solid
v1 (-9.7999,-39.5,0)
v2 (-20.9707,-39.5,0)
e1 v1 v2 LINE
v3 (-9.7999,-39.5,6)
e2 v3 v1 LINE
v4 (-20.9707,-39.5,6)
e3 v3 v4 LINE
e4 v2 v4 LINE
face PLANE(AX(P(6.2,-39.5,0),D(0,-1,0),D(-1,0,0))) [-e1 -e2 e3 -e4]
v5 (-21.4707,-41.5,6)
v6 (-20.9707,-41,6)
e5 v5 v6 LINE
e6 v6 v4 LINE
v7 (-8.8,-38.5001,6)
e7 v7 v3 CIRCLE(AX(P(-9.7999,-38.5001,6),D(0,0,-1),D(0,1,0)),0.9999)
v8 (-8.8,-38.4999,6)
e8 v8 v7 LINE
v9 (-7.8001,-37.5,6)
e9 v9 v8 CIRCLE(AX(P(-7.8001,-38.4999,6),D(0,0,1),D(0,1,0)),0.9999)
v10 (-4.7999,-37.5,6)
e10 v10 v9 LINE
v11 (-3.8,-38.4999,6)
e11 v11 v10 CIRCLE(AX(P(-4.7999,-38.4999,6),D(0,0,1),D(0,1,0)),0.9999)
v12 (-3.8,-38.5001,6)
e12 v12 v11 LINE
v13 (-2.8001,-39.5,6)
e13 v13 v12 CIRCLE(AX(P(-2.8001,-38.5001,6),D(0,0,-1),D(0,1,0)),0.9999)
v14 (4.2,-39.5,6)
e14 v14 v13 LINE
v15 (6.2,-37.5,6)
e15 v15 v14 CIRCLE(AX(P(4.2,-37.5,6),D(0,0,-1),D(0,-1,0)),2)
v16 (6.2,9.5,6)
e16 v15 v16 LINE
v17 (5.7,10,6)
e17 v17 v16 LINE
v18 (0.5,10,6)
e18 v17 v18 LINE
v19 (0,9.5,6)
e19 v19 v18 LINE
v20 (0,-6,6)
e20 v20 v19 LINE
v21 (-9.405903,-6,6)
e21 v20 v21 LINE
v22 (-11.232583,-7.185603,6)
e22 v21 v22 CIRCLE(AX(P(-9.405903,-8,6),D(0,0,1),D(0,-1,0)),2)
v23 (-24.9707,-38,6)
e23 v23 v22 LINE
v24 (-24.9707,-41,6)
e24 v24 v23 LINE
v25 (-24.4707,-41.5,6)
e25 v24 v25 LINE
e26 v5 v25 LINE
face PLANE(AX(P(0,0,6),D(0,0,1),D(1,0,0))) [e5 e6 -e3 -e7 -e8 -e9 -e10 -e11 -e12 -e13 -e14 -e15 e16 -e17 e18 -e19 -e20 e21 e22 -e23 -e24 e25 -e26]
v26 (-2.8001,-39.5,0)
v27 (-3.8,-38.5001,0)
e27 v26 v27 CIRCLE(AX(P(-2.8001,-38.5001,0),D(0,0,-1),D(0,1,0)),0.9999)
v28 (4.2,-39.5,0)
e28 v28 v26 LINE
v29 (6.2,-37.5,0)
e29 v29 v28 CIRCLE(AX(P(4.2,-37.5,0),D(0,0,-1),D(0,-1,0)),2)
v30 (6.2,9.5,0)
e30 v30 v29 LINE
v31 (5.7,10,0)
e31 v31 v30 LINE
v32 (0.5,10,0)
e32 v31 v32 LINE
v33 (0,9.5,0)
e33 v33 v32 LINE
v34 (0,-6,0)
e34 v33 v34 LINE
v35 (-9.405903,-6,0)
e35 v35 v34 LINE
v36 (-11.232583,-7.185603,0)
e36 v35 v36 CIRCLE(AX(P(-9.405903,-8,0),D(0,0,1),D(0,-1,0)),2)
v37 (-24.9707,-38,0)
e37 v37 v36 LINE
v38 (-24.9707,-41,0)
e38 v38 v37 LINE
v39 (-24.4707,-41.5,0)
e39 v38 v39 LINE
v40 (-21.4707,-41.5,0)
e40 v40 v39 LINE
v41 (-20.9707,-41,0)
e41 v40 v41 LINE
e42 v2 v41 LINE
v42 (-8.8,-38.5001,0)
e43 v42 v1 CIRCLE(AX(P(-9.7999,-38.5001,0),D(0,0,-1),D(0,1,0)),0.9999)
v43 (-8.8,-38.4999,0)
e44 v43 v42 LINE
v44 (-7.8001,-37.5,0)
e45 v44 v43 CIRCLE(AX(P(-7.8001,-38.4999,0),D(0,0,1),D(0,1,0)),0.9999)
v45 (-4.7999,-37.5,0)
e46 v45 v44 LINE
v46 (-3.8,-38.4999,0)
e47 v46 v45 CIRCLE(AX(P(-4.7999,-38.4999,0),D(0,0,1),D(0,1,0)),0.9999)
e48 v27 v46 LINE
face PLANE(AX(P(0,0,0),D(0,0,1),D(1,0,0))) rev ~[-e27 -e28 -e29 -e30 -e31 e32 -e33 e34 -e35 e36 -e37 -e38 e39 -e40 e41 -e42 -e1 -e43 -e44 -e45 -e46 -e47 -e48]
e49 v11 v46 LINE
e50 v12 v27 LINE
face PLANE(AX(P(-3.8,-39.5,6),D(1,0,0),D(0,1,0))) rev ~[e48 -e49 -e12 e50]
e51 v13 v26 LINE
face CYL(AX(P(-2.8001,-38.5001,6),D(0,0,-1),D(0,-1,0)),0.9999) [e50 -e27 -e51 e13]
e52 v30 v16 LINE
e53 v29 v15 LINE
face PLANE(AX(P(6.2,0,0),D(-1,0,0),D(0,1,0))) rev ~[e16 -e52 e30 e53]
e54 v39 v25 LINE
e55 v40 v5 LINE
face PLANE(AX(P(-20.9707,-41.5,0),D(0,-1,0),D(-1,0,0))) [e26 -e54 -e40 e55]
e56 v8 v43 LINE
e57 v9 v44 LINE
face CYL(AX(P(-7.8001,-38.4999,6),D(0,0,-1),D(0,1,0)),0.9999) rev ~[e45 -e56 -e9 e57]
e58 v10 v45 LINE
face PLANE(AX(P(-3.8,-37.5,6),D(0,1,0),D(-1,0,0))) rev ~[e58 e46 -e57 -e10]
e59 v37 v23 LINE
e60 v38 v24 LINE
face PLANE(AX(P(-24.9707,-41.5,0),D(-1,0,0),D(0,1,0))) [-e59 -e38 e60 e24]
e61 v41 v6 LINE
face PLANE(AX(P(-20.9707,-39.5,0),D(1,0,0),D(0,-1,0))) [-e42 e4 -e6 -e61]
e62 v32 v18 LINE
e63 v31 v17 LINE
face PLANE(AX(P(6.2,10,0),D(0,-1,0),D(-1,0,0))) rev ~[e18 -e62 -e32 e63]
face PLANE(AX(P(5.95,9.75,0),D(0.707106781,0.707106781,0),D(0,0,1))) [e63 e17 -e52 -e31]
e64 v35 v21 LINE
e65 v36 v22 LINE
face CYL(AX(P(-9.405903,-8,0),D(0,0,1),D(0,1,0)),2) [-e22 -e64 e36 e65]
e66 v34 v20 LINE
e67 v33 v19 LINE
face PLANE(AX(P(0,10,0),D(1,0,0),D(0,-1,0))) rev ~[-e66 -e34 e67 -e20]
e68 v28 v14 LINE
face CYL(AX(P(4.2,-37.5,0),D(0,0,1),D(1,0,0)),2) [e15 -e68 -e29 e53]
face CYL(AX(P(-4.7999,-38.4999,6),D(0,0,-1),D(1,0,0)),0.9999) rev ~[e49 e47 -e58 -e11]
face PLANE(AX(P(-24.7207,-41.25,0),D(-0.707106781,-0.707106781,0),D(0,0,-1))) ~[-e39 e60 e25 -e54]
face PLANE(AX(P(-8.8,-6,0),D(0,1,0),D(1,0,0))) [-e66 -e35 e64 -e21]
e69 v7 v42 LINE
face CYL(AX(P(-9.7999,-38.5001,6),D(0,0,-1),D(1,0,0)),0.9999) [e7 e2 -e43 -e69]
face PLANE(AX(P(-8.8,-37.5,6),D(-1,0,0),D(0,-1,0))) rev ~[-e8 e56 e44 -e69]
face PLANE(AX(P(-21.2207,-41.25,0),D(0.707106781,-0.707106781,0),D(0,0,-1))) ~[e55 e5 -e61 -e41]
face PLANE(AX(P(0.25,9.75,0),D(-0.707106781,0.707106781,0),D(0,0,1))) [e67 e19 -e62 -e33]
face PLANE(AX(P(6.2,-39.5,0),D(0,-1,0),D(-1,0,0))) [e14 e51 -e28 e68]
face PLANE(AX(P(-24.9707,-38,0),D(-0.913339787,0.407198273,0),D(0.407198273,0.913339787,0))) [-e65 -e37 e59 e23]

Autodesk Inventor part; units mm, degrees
ref_plane "YZ Plane" through (0, 0, 0) normal (1, 0, 0) x (0, 1, 0)
ref_plane "XZ Plane" through (0, 0, 0) normal (0, 1, 0) x (-1, 0, 0)
ref_plane "XY Plane" through (0, 0, 0) normal (0, 0, 1) x (1, 0, 0)
ref_plane "Work Plane1" through (0, 0, 0) normal (0, 0, 1) x (1, 0, 0)
sketch "Sketch1" plane through (0, 0, 0) normal (0, 0, 1) x (1, 0, 0)
  line L0 (0, 0) -> (6.2, 0)
  line L1 (0, 0) -> (0, -6)
  line L2 (6.2, -6) -> (0, -6)
  line L3 (6.2, 0) -> (6.2, -6)
  line L4 (6.2, -14.15) -> (12.2, -14.15)
  line L5 (6.2, -6) -> (6.2, -14.15)
  line L6 (-8.8, -6) -> (6.2, -6)
  line L7 (-24.1812, -40.5) -> (-8.8, -6)
  line L8 (6.2, -40.5) -> (-24.1812, -40.5)
  line L9 (6.2, -34.15) -> (6.2, -40.5)
  line L10 (12.2, -34.15) -> (6.2, -34.15)
  line L11 (12.2, -14.15) -> (12.2, -34.15)
  line L12 (-26.0293, -42.3) -> (-19.9707, -42.3)
  line L13 (6.2, -14.15) -> (12.2, -14.15)
  line L14 (6.2, -6) -> (6.2, -14.15)
  line L15 (-8.8, -6) -> (6.2, -6)
  line L16 (-24.1812, -40.5) -> (-8.8, -6)
  line L17 (6.2, -40.5) -> (-24.1812, -40.5)
  line L18 (6.2, -34.15) -> (6.2, -40.5)
  line L19 (12.2, -34.15) -> (6.2, -34.15)
  line L20 (12.2, -14.15) -> (12.2, -34.15)
  line L21 (6.2, -39.5) -> (-20.9707, -39.5)
  line L22 (6.2, 10) -> (0, 10)
  line L23 (0, 10) -> (0, -6)
  line L24 (-20.9707, -39.5) -> (-20.9707, -41.5)
  line L25 (-20.9707, -41.5) -> (-24.9707, -41.5)
  line L26 (0, -6) -> (-8.8, -6)
  line L27 (-24.9707, -41.5) -> (-24.9707, -38)
  line L28 (-24.9707, -38) -> (-10.704, -6)
  line L29 (-10.704, -6) -> (-8.8, -6)
  line L30 (6.2, -39.5) -> (6.2, 10)
  dimension "d1" = 1
  dimension "d3" = 4
  dimension "d4" = 1
  dimension "d5" = 2
  dimension "d6" = 3.5
  dimension "d7" = 10
extrude "Plate1" add sketch "Sketch1" along normal blind 6 contours L23 L22 L30 L0 | L0 L3 L2 L1 | L2 L5 L30 L9 L21 L24 L8 L7 L6 | L7 L8 L24 L25 L27 L28 L29
sketch "Sketch2" plane through (0, 0, 6) normal (0, 0, 1) x (1, 0, 0)
  line L0 (6.2, 10) -> (6.2, -39.5) projected
  line L1 (0, 10) -> (6.2, 10) projected
  line L2 (0, -6) -> (0, 10) projected
  line L3 (-10.704, -6) -> (0, -6) projected
  line L4 (-24.9707, -38) -> (-10.704, -6) projected
  line L5 (-24.9707, -41.5) -> (-24.9707, -38) projected
  line L6 (-20.9707, -41.5) -> (-24.9707, -41.5) projected
  line L7 (-20.9707, -39.5) -> (-20.9707, -41.5) projected
  line L8 (6.2, -39.5) -> (-20.9707, -39.5) projected
  line L9 (-8.8, -39.5) -> (-3.8, -39.5)
  line L10 (-3.8, -39.5) -> (-3.8, -37.5)
  line L11 (-3.8, -37.5) -> (-8.8, -37.5)
  line L12 (-8.8, -37.5) -> (-8.8, -39.5)
  point P0 (0, 0)
  dimension "d9" = 5
  dimension "d10" = 2
  dimension "d11" = 10
extrude "Cut1" cut sketch "Sketch2" against normal blind 6 contours L8 L12 L11 L10
fillet "Corner Round1" radius 1 4 edges at (-8.8, -39.5, 3) (-8.8, -37.5, 3) (-3.8, -37.5, 3) (-3.8, -39.5, 3)
chamfer "Corner Chamfer1" distance 0.5 angle 45 2 edges at (-24.9707, -41.5, 3) (-20.9707, -41.5, 3)
chamfer "Corner Chamfer2" distance 0.5 angle 45 2 edges at (0, 10, 3) (6.2, 10, 3)
fillet "Corner Round2" radius 2 2 edges at (-10.704, -6, 3) (6.2, -39.5, 3)
equation "\"d12\" = Thickness"
equation "\"d8\" = Thickness"
equation "\"BendRadius\" = Thickness"
equation "\"BendReliefWidth\" = Thickness"
equation "\"BendReliefDepth\" = 0.5 * Thickness"
equation "\"CornerReliefSize\" = 4 * Thickness"
equation "\"MinimumRemnant\" = 2 * Thickness"
equation "\"TransitionRadius\" = BendRadius"
equation "\"JacobiRadiusSize\" = BendRadius"
equation "\"GapSize\" = Thickness"
equation "\"Thickness\" = 6"
properties part number "knop nuc" material "Wood (Birch)"
